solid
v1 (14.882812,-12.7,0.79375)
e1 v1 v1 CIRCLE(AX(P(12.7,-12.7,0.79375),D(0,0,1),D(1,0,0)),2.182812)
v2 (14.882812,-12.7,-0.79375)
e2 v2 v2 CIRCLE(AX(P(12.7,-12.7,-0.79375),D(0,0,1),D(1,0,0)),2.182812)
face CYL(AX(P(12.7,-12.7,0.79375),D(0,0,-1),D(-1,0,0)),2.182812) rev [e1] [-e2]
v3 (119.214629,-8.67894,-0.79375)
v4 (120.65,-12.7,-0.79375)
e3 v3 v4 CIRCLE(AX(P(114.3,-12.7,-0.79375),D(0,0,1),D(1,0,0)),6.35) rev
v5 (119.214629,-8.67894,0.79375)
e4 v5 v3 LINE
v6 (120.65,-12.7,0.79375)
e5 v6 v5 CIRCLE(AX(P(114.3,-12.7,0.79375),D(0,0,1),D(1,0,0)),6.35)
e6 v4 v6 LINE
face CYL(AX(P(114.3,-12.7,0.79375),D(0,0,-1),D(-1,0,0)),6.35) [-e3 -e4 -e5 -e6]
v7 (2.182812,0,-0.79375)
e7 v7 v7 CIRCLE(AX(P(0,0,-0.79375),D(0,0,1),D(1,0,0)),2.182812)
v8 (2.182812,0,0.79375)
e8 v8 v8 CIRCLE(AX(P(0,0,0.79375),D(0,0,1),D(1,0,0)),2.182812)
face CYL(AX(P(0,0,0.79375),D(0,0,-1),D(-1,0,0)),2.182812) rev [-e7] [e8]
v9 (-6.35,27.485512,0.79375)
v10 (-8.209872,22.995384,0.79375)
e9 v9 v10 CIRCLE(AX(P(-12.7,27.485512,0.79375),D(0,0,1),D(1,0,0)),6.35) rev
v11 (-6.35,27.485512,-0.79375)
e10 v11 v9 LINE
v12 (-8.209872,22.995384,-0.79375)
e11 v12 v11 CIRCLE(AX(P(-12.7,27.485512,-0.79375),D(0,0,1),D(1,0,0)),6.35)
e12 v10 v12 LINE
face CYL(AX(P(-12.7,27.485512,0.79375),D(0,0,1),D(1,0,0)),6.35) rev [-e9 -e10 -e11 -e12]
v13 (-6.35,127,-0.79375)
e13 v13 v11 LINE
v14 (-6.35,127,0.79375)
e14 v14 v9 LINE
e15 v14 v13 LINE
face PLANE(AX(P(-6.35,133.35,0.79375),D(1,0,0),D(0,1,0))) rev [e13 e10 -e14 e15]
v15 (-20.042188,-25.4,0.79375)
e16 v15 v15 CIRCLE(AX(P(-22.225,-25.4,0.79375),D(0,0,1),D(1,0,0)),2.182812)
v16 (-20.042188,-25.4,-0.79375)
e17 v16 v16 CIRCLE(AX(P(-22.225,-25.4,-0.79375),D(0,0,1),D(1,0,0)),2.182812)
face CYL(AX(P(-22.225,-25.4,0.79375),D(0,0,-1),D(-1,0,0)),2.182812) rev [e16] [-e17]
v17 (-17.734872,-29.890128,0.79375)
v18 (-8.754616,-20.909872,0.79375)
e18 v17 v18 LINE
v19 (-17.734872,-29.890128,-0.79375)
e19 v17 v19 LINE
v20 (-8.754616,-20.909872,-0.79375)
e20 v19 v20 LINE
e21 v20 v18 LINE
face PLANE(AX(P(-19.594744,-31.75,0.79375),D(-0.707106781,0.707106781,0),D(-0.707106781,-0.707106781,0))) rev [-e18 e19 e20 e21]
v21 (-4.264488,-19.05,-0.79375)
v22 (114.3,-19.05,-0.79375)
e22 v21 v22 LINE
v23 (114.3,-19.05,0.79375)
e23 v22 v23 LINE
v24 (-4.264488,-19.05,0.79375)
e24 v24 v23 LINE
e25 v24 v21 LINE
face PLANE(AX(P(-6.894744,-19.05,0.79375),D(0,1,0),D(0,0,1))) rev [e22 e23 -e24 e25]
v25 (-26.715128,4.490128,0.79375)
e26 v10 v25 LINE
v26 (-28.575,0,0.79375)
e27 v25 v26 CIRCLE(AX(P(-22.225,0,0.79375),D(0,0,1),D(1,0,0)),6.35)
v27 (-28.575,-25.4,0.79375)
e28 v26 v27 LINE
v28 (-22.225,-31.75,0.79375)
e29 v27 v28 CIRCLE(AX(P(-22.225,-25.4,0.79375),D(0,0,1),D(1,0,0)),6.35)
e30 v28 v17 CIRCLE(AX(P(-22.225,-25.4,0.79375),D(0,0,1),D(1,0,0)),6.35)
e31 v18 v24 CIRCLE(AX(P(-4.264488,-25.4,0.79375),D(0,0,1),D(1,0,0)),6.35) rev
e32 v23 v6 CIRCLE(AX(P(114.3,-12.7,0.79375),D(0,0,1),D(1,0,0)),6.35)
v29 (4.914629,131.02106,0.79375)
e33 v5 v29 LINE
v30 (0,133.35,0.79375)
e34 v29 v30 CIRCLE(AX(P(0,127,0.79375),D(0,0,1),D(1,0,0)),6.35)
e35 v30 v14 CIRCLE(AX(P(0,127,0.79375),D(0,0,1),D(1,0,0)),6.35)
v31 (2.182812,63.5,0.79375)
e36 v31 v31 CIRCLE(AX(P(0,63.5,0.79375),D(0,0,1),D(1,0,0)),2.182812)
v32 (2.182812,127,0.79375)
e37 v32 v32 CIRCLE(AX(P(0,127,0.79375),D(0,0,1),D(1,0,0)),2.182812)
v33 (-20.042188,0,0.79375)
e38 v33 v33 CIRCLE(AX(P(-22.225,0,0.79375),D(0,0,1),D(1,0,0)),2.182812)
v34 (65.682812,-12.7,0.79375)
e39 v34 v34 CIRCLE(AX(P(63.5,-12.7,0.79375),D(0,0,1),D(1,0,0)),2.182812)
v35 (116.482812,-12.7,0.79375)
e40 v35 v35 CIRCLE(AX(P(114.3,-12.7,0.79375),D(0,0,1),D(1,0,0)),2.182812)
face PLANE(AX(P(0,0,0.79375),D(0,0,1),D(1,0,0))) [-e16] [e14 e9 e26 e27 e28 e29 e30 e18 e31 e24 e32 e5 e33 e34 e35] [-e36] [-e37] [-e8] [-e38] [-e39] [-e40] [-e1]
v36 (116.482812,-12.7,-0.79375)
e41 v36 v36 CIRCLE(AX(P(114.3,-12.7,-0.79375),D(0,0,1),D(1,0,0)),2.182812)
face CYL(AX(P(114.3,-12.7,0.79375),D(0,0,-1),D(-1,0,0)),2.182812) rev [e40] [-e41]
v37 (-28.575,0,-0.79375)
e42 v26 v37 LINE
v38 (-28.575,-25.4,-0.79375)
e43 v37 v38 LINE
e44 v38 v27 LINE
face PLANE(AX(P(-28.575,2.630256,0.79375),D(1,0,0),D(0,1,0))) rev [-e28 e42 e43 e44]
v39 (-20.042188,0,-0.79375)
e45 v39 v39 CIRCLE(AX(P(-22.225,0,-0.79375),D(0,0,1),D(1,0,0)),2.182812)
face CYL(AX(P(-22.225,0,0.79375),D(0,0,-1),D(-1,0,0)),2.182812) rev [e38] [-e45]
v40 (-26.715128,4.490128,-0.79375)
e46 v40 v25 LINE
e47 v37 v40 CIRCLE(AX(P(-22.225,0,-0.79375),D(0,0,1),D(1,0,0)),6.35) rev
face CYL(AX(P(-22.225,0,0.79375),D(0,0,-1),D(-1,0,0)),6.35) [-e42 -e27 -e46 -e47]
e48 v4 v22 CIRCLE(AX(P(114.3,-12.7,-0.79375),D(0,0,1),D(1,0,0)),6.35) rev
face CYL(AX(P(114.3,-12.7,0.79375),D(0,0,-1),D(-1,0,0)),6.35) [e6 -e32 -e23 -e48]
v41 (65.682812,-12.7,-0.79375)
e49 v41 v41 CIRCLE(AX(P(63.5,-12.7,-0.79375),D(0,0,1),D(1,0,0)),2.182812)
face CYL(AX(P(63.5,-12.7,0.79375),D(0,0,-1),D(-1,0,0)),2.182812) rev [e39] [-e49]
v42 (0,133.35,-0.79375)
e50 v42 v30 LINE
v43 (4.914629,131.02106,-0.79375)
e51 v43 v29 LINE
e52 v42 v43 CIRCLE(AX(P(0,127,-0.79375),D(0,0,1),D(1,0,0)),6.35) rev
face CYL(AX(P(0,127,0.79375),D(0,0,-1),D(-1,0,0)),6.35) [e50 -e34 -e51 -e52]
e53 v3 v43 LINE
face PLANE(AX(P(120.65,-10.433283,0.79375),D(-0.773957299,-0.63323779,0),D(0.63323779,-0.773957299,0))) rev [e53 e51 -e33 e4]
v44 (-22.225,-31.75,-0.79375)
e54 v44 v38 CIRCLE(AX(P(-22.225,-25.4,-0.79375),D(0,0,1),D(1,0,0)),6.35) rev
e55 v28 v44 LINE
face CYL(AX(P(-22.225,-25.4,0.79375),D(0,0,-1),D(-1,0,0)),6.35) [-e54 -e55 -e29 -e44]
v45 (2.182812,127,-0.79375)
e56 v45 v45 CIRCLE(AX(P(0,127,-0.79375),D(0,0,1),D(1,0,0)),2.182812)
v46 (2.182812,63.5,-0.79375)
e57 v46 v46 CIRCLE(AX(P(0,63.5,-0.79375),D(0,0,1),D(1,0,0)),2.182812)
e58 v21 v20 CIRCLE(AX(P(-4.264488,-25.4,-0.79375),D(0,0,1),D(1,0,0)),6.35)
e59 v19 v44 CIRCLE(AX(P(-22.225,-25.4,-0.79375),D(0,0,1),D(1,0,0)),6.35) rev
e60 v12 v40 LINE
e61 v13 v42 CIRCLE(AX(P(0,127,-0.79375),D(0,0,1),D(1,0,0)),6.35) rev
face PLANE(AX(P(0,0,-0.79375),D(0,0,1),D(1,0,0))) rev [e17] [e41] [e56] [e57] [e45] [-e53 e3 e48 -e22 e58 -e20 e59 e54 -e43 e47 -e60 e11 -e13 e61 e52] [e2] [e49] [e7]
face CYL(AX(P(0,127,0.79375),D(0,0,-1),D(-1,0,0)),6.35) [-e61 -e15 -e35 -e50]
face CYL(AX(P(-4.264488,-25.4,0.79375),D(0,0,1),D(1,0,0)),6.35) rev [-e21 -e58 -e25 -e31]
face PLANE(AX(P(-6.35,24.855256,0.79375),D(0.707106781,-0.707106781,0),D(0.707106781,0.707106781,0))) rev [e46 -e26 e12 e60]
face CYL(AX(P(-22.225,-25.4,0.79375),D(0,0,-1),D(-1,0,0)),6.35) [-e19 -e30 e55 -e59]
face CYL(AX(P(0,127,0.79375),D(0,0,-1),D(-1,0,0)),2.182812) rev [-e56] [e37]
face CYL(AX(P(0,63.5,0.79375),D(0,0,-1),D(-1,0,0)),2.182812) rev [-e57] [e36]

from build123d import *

# Parameters (mm, degrees)
SKETCH1_R           = 2.1828125
BOSS_EXTRUDE1_DEPTH = 0.79375
FILLET1_R           = 6.35


with BuildPart() as part:
    # Sketch1 → Boss-Extrude1 (new, symmetric)
    with BuildSketch(Plane.XY):
        Polygon((-28.575, 2.630256121), (-28.575, -31.75), (-19.594743879, -31.75), (-6.894743879, -19.05), (120.65, -19.05), (120.65, -10.433282549), (3.00913246, 133.35), (-6.35, 133.35), (-6.35, 24.855256121), align=None)
        Circle(SKETCH1_R, mode=Mode.SUBTRACT)
        with Locations((0, 63.5)):
            Circle(SKETCH1_R, mode=Mode.SUBTRACT)
        with Locations((12.7, -12.7)):
            Circle(SKETCH1_R, mode=Mode.SUBTRACT)
        with Locations((63.5, -12.7)):
            Circle(SKETCH1_R, mode=Mode.SUBTRACT)
        with Locations((-22.225, 0)):
            Circle(SKETCH1_R, mode=Mode.SUBTRACT)
        with Locations((-22.225, -25.4)):
            Circle(SKETCH1_R, mode=Mode.SUBTRACT)
        with Locations((0, 127)):
            Circle(SKETCH1_R, mode=Mode.SUBTRACT)
        with Locations((114.3, -12.7)):
            Circle(SKETCH1_R, mode=Mode.SUBTRACT)
    extrude(amount=BOSS_EXTRUDE1_DEPTH, both=True)

    # Fillet1
    fillet1_edges = [part.edges().sort_by_distance(p)[0] for p in [
        (120.65, -19.05, 0),
        (120.65, -10.433282549, 0),
        (-6.894743879, -19.05, 0),
        (-19.594743879, -31.75, 0),
        (-28.575, -31.75, 0),
        (-28.575, 2.630256121, 0),
        (-6.35, 24.855256121, 0),
        (3.00913246, 133.35, 0),
        (-6.35, 133.35, 0),
    ]]
    fillet(fillet1_edges, radius=FILLET1_R - 0.0001)  # a hair under: the kernel refuses the full size


solid = part.part
